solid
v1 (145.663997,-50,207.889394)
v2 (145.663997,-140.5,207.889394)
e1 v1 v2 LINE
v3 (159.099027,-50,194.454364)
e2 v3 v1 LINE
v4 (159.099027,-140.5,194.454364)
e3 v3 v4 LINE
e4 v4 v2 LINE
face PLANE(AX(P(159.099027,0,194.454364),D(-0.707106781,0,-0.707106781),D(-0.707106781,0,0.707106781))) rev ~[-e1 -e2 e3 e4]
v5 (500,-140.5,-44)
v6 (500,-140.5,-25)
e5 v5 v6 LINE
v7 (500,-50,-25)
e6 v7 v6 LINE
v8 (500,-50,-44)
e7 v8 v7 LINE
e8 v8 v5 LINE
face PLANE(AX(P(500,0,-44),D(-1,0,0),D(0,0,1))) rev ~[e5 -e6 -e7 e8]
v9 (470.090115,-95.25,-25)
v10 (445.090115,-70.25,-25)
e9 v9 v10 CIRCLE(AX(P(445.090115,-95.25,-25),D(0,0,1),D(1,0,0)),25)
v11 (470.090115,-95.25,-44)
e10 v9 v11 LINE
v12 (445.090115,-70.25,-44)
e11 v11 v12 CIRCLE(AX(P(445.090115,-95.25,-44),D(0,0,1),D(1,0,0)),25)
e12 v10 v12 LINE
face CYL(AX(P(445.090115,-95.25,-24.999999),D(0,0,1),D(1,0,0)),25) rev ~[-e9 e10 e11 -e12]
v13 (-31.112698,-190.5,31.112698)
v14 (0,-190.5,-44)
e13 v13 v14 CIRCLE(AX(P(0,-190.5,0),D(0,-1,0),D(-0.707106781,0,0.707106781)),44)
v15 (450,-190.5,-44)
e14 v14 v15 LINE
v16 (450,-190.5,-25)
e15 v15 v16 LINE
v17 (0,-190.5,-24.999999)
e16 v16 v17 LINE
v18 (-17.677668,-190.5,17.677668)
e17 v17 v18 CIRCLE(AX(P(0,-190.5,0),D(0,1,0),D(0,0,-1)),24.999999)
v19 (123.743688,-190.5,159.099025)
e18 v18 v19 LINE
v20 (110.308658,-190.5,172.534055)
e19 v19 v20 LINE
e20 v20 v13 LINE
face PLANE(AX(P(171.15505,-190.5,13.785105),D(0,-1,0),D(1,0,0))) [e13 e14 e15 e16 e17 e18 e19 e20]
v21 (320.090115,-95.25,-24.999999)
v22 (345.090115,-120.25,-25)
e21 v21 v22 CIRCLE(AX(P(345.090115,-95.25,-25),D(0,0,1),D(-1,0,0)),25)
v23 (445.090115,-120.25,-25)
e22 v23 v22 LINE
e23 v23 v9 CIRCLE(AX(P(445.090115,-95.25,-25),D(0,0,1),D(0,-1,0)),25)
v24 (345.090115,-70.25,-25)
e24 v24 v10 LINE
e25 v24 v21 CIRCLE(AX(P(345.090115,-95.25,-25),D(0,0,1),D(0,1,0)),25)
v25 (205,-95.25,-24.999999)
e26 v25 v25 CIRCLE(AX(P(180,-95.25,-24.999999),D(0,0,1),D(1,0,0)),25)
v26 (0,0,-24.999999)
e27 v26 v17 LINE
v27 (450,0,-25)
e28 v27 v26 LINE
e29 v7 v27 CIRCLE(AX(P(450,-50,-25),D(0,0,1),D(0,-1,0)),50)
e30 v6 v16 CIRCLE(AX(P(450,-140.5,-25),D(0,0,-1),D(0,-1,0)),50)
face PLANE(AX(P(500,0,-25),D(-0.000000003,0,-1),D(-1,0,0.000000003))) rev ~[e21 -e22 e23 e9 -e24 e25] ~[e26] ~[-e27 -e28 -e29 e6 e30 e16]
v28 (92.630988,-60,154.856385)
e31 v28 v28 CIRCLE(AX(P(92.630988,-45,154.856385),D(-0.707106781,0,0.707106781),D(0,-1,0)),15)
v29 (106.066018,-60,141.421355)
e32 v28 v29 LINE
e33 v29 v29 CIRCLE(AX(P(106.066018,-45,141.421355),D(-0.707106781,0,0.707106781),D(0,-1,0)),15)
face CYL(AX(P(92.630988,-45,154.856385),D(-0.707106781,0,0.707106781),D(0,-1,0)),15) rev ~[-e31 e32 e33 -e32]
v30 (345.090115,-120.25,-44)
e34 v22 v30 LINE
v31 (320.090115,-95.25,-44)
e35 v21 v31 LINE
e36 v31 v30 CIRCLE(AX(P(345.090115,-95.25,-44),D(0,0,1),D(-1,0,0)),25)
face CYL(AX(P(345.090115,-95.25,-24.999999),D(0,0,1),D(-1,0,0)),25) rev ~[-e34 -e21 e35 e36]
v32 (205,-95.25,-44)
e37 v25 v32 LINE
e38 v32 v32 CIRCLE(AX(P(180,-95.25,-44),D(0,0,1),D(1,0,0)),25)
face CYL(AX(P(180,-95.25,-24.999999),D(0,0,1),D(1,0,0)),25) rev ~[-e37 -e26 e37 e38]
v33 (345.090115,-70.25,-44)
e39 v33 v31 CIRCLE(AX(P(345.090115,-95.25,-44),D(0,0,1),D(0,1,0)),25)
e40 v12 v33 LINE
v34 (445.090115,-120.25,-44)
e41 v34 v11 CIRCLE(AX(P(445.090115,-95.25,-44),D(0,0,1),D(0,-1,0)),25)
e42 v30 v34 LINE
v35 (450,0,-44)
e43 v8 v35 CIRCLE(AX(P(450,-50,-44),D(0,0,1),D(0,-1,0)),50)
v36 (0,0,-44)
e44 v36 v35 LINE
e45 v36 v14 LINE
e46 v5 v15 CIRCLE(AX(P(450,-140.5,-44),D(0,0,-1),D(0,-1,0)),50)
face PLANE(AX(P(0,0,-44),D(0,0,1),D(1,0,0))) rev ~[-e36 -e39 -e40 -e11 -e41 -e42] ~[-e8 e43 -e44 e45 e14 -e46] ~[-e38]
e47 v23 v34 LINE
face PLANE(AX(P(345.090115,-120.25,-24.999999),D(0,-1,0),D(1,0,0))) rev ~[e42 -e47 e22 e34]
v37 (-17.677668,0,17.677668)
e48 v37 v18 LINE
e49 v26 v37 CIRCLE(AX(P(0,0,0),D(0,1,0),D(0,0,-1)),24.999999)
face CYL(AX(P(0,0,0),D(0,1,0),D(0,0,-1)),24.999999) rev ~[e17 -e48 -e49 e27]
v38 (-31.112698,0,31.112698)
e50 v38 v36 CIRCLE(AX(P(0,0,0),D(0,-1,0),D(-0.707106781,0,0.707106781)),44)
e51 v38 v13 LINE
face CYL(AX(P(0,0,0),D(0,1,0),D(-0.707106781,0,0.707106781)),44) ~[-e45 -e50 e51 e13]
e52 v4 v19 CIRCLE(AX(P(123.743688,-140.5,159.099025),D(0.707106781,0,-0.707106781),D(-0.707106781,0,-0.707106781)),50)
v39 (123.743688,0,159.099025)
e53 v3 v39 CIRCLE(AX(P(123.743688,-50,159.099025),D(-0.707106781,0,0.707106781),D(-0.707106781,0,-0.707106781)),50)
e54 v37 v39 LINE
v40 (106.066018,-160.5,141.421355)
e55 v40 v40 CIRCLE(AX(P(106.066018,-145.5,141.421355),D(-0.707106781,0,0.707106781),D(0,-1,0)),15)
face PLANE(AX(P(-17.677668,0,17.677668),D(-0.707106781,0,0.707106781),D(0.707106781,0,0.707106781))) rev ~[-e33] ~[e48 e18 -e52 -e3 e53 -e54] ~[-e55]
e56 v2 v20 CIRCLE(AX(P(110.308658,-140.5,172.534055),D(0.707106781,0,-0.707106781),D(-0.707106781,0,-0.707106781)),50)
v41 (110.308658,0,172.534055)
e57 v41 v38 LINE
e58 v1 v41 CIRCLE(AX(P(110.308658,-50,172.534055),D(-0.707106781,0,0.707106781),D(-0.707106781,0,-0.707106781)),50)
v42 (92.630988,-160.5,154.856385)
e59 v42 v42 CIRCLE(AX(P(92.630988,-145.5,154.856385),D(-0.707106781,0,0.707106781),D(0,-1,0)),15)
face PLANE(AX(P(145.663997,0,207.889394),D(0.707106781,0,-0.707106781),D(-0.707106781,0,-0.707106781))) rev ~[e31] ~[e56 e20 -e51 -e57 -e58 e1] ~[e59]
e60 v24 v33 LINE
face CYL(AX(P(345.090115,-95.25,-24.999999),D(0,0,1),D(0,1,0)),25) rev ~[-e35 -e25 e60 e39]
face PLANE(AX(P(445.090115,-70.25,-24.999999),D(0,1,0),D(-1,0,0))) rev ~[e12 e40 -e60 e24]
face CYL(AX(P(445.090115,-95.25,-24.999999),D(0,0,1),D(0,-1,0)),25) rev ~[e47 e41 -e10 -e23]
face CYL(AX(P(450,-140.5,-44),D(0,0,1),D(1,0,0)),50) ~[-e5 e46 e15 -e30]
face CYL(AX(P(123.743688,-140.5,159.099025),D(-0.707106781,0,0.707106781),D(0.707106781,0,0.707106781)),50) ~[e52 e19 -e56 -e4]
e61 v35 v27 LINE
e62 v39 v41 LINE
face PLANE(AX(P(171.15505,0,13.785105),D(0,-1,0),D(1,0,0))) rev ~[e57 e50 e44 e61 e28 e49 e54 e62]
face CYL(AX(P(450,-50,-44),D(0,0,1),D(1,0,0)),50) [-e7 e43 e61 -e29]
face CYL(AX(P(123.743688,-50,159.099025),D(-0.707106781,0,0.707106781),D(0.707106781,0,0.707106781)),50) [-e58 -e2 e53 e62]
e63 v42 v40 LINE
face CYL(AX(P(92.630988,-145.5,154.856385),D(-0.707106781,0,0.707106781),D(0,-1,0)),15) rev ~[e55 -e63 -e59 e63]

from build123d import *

# Parameters (mm, degrees)
F1_DEPTH = 190.5
F2_R     = 50
F3_R     = 25
F4_DEPTH = 25
F5_DEPTH = 25
F6_R     = 15
F7_DEPTH = 25


# Not quite as in the source:
# - ends of sketch curves that miss each other by under 0.0002 mm in the source are joined


with BuildPart() as f1:
    # F0 (on Front) → F1 (new body)
    with BuildSketch(Plane.XZ):
        with BuildLine():
            Line((145.6639969244, 207.8893936688), (-31.1126983722, 31.1126983722))
            ThreePointArc((-31.1126983722, 31.1126983722), (-40.6506994305, -16.8380710241), (0, -44))
            Line((0, -44), (500, -44))
            Line((500, -44), (500, -25))
            Line((500, -25), (0, -24.9999985185))
            ThreePointArc((0, -24.9999985185), (-23.096986944, -9.5670852422), (-17.6776684821, 17.6776684821))
            Line((-17.6776684821, 17.6776684821), (159.0990268146, 194.4543637787))
            Line((159.0990268146, 194.4543637787), (145.6639969244, 207.8893936688))
        make_face()
    extrude(amount=F1_DEPTH)

    # F2
    f2_edges = [f1.edges().sort_by_distance(p)[0] for p in [
        (500, 0, -34.5),
        (500, -190.5, -34.5),
        (152.381512, -190.5, 201.171879),
        (152.381512, 0, 201.171879),
    ]]
    fillet(f2_edges, radius=F2_R)

    # F3 (on face) → F4 (cut)
    with BuildSketch(Plane.XY.offset(-24.9999985185)):
        with Locations((180, -95.25)):
            Circle(F3_R)
    extrude(amount=-F4_DEPTH, mode=Mode.SUBTRACT)

    # F3 (on face) → F5 (cut)
    with BuildSketch(Plane.XY.offset(-24.9999985185)):
        with BuildLine():
            Line((445.0901150703, -70.25), (345.0901150703, -70.25))
            ThreePointArc((345.0901150703, -70.25), (327.4124455407, -77.5723304703), (320.0901150703, -95.25))
            ThreePointArc((320.0901150703, -95.25), (327.4124455407, -112.9276695297), (345.0901150703, -120.25))
            Line((345.0901150703, -120.25), (445.0901150703, -120.25))
            ThreePointArc((445.0901150703, -120.25), (462.7677846, -112.9276695297), (470.0901150703, -95.25))
            ThreePointArc((470.0901150703, -95.25), (462.7677846, -77.5723304703), (445.0901150703, -70.25))
        make_face()
    extrude(amount=-F5_DEPTH, mode=Mode.SUBTRACT)

    # F6 (on face) → F7 (cut)
    with BuildSketch(Plane(origin=(-31.1126983722, 0, 31.1126983722), x_dir=(0, -1, 0), z_dir=(-0.7071067812, 0, 0.7071067812))):
        with Locations((45, 175)):
            Circle(F6_R)
        with Locations((145.5, 175)):
            Circle(F6_R)
    extrude(amount=-F7_DEPTH, mode=Mode.SUBTRACT)


solid = f1.part
